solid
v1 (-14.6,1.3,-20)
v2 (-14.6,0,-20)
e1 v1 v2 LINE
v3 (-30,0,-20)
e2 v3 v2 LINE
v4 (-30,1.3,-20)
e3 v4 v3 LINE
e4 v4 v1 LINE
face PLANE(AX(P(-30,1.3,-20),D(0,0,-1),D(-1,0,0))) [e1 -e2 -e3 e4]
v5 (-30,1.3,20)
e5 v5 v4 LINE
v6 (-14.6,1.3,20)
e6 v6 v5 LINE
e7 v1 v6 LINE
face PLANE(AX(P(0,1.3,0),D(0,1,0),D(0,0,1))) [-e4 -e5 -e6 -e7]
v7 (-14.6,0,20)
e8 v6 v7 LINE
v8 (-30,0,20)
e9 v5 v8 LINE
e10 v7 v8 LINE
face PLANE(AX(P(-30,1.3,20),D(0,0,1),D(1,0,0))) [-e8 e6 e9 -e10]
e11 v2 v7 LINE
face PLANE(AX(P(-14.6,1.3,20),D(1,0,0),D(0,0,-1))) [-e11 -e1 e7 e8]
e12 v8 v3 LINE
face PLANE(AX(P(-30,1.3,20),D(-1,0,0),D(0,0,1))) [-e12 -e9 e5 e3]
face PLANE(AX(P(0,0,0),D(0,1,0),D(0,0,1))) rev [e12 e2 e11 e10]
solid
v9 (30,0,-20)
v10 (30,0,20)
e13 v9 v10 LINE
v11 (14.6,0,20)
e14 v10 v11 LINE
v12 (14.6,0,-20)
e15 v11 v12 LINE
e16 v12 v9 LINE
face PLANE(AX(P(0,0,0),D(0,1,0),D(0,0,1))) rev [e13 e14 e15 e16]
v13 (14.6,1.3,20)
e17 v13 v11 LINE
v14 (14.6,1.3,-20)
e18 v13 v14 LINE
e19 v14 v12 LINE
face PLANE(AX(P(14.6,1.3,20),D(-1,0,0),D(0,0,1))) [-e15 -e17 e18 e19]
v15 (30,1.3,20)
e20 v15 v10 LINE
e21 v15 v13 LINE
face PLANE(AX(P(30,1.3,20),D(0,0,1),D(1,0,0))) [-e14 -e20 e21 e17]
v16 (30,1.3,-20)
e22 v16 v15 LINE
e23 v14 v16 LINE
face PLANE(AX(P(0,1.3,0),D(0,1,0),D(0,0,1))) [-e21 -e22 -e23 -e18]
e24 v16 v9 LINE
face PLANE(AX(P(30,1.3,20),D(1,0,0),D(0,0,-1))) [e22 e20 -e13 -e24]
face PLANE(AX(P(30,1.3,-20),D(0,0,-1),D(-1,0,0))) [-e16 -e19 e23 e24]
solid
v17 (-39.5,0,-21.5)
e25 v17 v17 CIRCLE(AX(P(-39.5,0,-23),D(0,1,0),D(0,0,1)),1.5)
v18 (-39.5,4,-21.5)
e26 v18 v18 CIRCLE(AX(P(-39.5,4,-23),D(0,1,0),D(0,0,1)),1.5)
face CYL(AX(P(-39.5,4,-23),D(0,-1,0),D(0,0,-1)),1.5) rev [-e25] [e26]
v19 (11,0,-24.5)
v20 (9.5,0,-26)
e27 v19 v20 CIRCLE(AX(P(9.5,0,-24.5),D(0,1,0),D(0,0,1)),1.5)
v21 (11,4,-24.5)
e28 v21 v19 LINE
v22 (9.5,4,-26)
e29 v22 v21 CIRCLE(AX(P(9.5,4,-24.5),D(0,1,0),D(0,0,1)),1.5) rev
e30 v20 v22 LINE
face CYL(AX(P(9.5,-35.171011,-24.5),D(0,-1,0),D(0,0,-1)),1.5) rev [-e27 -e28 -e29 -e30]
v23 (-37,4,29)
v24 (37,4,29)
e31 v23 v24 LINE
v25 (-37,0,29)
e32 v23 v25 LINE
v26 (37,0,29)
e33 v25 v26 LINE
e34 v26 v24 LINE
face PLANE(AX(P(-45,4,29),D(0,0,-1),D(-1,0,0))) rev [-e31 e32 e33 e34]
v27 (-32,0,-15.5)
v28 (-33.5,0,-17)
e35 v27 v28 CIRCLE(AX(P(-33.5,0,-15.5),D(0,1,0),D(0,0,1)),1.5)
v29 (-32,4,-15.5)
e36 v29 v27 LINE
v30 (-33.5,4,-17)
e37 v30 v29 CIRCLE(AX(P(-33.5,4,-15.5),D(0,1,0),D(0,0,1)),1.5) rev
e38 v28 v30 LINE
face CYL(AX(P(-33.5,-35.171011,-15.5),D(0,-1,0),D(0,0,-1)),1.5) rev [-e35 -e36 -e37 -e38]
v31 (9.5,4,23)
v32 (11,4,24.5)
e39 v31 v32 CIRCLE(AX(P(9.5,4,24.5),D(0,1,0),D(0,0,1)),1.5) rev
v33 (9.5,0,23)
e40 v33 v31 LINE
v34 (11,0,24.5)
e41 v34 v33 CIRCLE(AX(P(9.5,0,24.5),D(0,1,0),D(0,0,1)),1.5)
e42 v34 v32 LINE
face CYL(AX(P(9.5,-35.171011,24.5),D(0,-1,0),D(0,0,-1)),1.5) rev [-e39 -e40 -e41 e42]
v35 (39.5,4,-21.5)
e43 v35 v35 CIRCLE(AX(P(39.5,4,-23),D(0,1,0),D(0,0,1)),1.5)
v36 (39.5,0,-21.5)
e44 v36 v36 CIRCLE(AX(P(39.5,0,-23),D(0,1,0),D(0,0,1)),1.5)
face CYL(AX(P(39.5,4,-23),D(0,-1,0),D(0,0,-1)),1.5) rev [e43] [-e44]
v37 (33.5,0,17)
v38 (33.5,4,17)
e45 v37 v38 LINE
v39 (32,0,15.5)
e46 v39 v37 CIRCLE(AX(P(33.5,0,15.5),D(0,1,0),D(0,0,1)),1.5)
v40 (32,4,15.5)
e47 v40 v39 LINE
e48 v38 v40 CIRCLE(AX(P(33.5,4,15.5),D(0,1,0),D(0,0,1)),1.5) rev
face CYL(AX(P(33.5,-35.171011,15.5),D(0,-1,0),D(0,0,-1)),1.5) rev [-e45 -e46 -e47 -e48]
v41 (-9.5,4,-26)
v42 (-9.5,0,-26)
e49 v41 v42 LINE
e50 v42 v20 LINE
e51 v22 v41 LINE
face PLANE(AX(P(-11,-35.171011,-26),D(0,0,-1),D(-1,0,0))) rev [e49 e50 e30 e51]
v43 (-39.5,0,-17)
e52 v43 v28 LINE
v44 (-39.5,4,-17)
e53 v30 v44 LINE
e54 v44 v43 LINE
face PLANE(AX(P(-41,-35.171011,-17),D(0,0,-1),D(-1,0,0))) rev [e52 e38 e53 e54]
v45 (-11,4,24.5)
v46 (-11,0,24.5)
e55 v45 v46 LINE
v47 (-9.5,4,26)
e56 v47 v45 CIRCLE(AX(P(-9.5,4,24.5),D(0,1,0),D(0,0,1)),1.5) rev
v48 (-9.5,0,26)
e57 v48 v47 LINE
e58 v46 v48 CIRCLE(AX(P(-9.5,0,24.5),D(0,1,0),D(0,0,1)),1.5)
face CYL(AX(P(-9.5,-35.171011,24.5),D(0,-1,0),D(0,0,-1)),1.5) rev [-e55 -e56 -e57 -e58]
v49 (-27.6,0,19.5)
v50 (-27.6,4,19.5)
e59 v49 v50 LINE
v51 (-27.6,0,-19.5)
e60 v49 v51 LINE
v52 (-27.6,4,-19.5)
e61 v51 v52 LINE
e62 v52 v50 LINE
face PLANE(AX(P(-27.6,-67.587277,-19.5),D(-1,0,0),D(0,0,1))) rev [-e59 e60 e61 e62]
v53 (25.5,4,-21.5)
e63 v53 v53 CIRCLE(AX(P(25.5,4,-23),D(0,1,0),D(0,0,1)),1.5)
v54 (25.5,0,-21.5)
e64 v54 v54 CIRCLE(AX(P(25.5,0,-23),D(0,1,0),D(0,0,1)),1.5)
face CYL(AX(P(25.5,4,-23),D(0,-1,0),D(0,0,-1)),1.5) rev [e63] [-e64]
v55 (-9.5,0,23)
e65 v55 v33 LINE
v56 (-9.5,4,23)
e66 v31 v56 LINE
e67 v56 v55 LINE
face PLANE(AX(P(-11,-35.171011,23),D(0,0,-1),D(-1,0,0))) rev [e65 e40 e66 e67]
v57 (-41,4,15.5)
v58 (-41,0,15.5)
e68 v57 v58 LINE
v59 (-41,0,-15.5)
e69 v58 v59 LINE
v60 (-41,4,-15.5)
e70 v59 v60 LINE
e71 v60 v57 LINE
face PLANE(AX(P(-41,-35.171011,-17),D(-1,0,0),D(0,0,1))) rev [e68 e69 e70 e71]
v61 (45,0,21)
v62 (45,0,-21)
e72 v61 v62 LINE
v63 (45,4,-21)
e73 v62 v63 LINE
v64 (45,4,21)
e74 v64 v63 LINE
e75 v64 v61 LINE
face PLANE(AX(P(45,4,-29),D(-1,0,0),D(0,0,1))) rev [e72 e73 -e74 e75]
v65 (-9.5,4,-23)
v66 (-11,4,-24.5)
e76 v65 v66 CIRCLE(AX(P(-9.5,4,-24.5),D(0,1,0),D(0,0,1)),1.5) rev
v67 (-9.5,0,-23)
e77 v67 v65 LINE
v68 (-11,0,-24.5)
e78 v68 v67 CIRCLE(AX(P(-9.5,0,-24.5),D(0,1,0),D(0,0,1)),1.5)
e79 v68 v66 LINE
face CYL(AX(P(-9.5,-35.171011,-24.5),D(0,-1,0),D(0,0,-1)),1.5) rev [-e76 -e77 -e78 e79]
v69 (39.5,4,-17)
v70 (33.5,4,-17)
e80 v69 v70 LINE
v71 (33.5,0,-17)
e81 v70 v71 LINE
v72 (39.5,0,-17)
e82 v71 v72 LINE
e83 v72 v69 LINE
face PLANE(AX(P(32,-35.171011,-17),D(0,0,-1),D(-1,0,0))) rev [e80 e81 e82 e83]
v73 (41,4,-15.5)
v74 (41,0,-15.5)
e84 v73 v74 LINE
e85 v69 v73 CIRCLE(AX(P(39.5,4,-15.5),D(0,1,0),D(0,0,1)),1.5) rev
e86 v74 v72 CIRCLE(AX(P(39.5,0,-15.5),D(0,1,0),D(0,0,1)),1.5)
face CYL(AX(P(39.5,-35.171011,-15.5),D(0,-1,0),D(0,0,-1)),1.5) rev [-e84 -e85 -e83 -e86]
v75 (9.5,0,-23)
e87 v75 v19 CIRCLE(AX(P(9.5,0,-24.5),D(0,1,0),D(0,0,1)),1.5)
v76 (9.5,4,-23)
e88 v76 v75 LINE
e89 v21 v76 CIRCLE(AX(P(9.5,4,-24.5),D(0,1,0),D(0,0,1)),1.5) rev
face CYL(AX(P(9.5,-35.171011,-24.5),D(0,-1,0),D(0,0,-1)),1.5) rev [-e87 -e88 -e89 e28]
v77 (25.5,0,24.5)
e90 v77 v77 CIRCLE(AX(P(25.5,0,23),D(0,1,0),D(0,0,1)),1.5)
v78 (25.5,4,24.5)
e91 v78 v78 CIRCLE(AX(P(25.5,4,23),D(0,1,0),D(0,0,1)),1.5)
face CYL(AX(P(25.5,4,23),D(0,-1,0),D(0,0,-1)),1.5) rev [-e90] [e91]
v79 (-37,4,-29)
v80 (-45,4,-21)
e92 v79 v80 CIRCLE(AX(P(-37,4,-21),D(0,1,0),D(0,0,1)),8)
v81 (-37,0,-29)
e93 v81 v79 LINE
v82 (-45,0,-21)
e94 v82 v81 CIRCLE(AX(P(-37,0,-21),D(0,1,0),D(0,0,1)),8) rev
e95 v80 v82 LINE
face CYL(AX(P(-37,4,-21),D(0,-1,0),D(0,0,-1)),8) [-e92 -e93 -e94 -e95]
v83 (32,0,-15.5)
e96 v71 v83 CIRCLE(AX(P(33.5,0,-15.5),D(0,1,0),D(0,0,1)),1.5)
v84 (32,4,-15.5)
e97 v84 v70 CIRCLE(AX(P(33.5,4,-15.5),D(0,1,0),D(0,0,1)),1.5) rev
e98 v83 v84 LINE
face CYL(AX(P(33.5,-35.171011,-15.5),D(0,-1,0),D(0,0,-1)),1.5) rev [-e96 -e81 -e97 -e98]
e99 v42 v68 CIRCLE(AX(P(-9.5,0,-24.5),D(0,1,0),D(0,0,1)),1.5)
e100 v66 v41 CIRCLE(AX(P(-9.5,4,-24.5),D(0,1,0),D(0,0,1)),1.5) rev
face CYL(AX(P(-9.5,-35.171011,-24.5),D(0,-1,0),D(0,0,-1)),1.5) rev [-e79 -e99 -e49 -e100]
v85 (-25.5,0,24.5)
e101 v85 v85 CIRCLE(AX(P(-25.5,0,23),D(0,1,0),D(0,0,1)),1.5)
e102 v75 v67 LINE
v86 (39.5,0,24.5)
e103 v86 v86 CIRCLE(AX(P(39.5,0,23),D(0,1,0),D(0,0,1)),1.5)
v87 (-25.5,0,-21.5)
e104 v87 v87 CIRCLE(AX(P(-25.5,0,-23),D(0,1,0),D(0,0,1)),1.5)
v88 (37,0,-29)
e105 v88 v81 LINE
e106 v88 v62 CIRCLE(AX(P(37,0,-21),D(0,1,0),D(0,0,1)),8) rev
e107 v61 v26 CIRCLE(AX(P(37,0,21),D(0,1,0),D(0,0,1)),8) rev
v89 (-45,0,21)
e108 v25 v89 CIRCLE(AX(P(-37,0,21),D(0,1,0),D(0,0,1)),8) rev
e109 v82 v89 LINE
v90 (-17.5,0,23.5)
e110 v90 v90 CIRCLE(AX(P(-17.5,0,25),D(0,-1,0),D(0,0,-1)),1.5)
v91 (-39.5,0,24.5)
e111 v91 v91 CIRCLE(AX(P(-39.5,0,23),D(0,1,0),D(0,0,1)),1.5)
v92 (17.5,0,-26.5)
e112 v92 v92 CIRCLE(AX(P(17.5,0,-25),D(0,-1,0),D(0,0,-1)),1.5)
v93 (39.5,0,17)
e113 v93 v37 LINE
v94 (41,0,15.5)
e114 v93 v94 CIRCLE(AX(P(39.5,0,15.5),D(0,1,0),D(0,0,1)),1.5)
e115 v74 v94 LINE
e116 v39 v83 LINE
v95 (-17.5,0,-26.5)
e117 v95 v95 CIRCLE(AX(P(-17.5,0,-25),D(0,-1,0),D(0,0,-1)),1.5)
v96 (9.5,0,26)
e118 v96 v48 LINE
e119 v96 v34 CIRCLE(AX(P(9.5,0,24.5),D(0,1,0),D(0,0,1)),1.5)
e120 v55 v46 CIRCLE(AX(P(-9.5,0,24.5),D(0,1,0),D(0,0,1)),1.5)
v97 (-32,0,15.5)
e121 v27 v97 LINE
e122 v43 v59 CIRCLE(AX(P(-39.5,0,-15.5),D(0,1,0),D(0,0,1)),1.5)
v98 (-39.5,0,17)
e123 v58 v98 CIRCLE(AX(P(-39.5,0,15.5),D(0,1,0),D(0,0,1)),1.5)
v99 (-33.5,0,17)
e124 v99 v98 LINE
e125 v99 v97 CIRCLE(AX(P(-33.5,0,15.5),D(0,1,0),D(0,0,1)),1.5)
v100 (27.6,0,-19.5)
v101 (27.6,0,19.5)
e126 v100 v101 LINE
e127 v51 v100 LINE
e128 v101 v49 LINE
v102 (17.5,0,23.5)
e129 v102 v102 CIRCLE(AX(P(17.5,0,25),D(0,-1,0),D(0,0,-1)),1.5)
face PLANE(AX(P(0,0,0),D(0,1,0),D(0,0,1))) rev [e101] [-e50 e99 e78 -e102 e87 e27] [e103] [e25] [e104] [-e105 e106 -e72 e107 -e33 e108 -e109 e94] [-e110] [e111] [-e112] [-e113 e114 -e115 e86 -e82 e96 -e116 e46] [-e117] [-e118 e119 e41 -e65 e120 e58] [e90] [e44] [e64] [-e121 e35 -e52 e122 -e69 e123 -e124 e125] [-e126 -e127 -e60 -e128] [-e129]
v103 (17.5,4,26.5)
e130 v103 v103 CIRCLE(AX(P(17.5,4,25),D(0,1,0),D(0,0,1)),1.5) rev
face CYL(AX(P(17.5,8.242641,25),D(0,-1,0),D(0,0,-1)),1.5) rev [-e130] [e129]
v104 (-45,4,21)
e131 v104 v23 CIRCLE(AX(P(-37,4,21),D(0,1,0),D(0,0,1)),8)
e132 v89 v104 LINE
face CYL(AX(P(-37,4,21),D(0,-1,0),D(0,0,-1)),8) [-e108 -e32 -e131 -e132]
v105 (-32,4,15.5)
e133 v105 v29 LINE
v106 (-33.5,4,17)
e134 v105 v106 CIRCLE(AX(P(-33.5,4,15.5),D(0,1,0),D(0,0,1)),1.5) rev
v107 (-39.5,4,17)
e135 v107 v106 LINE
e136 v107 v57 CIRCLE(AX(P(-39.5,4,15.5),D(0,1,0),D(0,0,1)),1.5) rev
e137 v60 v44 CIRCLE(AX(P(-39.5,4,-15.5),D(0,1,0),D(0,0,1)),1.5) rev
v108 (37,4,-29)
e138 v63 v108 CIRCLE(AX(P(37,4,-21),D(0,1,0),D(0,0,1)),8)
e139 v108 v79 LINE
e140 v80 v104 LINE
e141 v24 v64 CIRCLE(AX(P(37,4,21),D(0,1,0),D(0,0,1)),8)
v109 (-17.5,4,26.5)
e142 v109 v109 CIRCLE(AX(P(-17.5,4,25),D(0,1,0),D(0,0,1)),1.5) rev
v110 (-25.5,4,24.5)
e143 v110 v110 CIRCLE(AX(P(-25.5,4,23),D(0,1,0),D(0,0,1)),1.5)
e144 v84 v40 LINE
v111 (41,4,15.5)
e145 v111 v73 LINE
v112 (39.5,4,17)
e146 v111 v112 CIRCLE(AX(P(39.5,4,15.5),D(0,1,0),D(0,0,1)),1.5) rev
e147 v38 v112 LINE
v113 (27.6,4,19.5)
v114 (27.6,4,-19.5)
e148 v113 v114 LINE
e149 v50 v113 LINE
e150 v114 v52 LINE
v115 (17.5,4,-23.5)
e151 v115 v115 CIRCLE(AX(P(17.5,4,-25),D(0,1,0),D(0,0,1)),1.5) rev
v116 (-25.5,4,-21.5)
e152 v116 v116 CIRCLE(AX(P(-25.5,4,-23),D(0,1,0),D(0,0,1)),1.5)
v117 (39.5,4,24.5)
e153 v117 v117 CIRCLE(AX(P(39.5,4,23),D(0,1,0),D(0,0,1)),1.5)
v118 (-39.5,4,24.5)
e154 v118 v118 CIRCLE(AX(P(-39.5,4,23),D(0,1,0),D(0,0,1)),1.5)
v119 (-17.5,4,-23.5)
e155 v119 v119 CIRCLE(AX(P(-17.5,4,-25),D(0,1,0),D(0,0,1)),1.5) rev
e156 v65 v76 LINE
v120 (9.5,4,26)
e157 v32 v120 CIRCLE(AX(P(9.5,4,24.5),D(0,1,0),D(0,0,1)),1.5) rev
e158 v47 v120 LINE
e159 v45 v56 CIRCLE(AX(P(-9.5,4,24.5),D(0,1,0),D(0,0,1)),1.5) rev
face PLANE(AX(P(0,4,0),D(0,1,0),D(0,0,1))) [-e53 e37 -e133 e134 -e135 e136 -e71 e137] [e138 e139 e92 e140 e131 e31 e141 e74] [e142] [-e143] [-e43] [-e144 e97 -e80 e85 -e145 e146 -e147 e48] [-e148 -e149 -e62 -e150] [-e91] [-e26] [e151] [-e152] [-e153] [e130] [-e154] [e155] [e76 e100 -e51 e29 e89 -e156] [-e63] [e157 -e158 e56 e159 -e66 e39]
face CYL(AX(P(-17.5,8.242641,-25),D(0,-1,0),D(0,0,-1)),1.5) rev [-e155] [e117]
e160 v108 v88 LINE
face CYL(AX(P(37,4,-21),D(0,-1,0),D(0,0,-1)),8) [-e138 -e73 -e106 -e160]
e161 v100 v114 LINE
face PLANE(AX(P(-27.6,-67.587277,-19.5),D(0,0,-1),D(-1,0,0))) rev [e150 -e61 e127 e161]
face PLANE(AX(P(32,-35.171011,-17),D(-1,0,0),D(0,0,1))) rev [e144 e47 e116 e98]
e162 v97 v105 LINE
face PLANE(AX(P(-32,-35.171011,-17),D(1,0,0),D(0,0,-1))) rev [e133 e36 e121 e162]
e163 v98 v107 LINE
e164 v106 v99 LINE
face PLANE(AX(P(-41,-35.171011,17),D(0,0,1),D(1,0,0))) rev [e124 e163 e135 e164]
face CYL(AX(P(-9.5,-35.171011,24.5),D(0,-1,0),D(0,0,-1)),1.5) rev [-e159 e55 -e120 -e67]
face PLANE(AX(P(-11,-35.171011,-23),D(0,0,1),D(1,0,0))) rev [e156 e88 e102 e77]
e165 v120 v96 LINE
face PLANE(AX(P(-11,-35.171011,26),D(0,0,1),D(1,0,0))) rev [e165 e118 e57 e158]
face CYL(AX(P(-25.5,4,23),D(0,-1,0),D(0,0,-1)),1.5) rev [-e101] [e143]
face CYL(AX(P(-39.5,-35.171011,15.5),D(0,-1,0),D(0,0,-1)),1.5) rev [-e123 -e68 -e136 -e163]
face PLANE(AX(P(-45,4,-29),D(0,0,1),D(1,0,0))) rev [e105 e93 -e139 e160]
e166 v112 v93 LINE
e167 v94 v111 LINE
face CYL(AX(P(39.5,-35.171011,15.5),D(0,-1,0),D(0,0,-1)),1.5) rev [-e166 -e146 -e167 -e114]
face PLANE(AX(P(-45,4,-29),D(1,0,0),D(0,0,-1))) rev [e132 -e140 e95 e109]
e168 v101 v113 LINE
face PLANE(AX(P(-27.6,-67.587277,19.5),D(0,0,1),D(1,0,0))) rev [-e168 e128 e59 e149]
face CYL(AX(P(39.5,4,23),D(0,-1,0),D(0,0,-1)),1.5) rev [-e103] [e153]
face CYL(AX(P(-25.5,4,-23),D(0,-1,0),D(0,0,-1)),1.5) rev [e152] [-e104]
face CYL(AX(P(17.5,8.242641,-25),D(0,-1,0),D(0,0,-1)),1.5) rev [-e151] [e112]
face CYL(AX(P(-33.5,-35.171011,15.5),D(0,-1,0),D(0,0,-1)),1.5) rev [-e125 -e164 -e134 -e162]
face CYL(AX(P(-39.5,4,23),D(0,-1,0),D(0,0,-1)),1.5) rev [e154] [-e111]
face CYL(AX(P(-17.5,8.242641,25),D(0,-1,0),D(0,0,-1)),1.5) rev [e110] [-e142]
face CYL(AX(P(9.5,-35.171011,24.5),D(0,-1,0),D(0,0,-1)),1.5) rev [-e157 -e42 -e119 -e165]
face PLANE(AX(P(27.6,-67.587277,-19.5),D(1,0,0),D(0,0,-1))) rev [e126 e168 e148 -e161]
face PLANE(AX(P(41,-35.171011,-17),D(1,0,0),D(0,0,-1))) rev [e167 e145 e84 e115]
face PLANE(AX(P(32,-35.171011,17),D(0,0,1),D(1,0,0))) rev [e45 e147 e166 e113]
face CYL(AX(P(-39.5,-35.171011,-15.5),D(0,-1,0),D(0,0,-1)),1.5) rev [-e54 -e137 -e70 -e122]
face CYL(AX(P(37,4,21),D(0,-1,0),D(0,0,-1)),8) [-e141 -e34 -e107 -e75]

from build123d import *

# Parameters (mm, degrees)
SKETCH_1_W          = 90
SKETCH_1_H          = 58
SKETCH_1_R          = 1.5
EXTRUDE_1_DEPTH     = 4
SKETCH_2_W          = 55.2
SKETCH_2_H          = 39
CUT_EXTRUDE_1_DEPTH = 4
SKETCH_13_R         = 1.5
CUT_EXTRUDE_6_DEPTH = 4
SKETCH_14_W         = 9
SKETCH_14_H         = 34
SKETCH_14_W_2       = 22
SKETCH_14_H_2       = 3
CUT_EXTRUDE_7_DEPTH = 4
FILLET_1_R          = 8
FILLET_2_R          = 1.5
SKETCH_18_W         = 15.4
SKETCH_18_H         = 40
EXTRUDE_4_DEPTH     = 1.3
EXTRUDE_4_2_DEPTH   = 1.3


with BuildPart() as part:
    # 草图1 → 凸台-拉伸1 (new body)
    with BuildSketch(Plane(origin=(0, 0, 0), x_dir=(1, 0, 0), z_dir=(0, 1, 0))):
        Rectangle(SKETCH_1_W, SKETCH_1_H)
        with Locations(Location((-25.5, 23, 0), (0, 0, 270))):
            Circle(SKETCH_1_R, mode=Mode.SUBTRACT)
        with Locations(Location((39.5, 23, 0), (0, 0, 270))):
            Circle(SKETCH_1_R, mode=Mode.SUBTRACT)
        with Locations(Location((-25.5, -23, 0), (0, 0, 270))):
            Circle(SKETCH_1_R, mode=Mode.SUBTRACT)
        with Locations(Location((39.5, -23, 0), (0, 0, 270))):
            Circle(SKETCH_1_R, mode=Mode.SUBTRACT)
        with Locations(Location((-39.5, 23, 0), (0, 0, 270))):
            Circle(SKETCH_1_R, mode=Mode.SUBTRACT)
        with Locations(Location((-39.5, -23, 0), (0, 0, 270))):
            Circle(SKETCH_1_R, mode=Mode.SUBTRACT)
        with Locations(Location((25.5, -23, 0), (0, 0, 270))):
            Circle(SKETCH_1_R, mode=Mode.SUBTRACT)
        with Locations(Location((25.5, 23, 0), (0, 0, 270))):
            Circle(SKETCH_1_R, mode=Mode.SUBTRACT)
    extrude(amount=EXTRUDE_1_DEPTH)

    # 草图2 → 切除-拉伸1 (cut)
    with BuildSketch(Plane(origin=(0, 4, 0), x_dir=(1, 0, 0), z_dir=(0, 1, 0))):
        Rectangle(SKETCH_2_W, SKETCH_2_H)
    extrude(amount=-CUT_EXTRUDE_1_DEPTH, mode=Mode.SUBTRACT)

    # 草图13 → 切除-拉伸6 (cut)
    with BuildSketch(Plane.XZ):
        with Locations(Location((-17.5, 25, 0), (0, 0, 270))):
            Circle(SKETCH_13_R)
        with Locations(Location((17.5, 25, 0), (0, 0, 270))):
            Circle(SKETCH_13_R)
        with Locations(Location((-17.5, -25, 0), (0, 0, 270))):
            Circle(SKETCH_13_R)
        with Locations(Location((17.5, -25, 0), (0, 0, 270))):
            Circle(SKETCH_13_R)
    extrude(amount=-CUT_EXTRUDE_6_DEPTH, mode=Mode.SUBTRACT)

    # 草图14 → 切除-拉伸7 (cut)
    with BuildSketch(Plane(origin=(0, 4, 0), x_dir=(1, 0, 0), z_dir=(0, 1, 0))):
        with Locations((36.5, 0)):
            Rectangle(SKETCH_14_W, SKETCH_14_H)
        with Locations((-36.5, 0)):
            Rectangle(SKETCH_14_W, SKETCH_14_H)
        with Locations((0, 24.5)):
            Rectangle(SKETCH_14_W_2, SKETCH_14_H_2)
        with Locations((0, -24.5)):
            Rectangle(SKETCH_14_W_2, SKETCH_14_H_2)
    extrude(amount=-CUT_EXTRUDE_7_DEPTH, mode=Mode.SUBTRACT)

    # 圆角1
    fillet_1_edges = [part.edges().sort_by_distance(p)[0] for p in [
        (45, 2, 29),
        (-45, 2, 29),
        (-45, 2, -29),
        (45, 2, -29),
    ]]
    fillet(fillet_1_edges, radius=FILLET_1_R)

    # 圆角2
    fillet_2_edges = [part.edges().sort_by_distance(p)[0] for p in [
        (11, 2, 23),
        (-11, 2, 23),
        (11, 2, 26),
        (-11, 2, 26),
        (-11, 2, -23),
        (11, 2, -23),
        (11, 2, -26),
        (-11, 2, -26),
        (41, 2, 17),
        (32, 2, 17),
        (41, 2, -17),
        (32, 2, -17),
        (-41, 2, 17),
        (-32, 2, 17),
        (-32, 2, -17),
        (-41, 2, -17),
    ]]
    fillet(fillet_2_edges, radius=FILLET_2_R - 0.0001)  # a hair under: the kernel refuses the full size


with BuildPart() as body_2:
    # 草图18 → 凸台-拉伸4 (new body)
    with BuildSketch(Plane.XZ):
        with Locations((-22.3, 0)):
            Rectangle(SKETCH_18_W, SKETCH_18_H)
    extrude(amount=-EXTRUDE_4_DEPTH)


with BuildPart() as body_3:
    # 草图18 → Extrude 4 2 (new body)
    with BuildSketch(Plane.XZ):
        with Locations((22.3, 0)):
            Rectangle(SKETCH_18_W, SKETCH_18_H)
    extrude(amount=-EXTRUDE_4_2_DEPTH)


solid = Compound([part.part, body_2.part, body_3.part])
